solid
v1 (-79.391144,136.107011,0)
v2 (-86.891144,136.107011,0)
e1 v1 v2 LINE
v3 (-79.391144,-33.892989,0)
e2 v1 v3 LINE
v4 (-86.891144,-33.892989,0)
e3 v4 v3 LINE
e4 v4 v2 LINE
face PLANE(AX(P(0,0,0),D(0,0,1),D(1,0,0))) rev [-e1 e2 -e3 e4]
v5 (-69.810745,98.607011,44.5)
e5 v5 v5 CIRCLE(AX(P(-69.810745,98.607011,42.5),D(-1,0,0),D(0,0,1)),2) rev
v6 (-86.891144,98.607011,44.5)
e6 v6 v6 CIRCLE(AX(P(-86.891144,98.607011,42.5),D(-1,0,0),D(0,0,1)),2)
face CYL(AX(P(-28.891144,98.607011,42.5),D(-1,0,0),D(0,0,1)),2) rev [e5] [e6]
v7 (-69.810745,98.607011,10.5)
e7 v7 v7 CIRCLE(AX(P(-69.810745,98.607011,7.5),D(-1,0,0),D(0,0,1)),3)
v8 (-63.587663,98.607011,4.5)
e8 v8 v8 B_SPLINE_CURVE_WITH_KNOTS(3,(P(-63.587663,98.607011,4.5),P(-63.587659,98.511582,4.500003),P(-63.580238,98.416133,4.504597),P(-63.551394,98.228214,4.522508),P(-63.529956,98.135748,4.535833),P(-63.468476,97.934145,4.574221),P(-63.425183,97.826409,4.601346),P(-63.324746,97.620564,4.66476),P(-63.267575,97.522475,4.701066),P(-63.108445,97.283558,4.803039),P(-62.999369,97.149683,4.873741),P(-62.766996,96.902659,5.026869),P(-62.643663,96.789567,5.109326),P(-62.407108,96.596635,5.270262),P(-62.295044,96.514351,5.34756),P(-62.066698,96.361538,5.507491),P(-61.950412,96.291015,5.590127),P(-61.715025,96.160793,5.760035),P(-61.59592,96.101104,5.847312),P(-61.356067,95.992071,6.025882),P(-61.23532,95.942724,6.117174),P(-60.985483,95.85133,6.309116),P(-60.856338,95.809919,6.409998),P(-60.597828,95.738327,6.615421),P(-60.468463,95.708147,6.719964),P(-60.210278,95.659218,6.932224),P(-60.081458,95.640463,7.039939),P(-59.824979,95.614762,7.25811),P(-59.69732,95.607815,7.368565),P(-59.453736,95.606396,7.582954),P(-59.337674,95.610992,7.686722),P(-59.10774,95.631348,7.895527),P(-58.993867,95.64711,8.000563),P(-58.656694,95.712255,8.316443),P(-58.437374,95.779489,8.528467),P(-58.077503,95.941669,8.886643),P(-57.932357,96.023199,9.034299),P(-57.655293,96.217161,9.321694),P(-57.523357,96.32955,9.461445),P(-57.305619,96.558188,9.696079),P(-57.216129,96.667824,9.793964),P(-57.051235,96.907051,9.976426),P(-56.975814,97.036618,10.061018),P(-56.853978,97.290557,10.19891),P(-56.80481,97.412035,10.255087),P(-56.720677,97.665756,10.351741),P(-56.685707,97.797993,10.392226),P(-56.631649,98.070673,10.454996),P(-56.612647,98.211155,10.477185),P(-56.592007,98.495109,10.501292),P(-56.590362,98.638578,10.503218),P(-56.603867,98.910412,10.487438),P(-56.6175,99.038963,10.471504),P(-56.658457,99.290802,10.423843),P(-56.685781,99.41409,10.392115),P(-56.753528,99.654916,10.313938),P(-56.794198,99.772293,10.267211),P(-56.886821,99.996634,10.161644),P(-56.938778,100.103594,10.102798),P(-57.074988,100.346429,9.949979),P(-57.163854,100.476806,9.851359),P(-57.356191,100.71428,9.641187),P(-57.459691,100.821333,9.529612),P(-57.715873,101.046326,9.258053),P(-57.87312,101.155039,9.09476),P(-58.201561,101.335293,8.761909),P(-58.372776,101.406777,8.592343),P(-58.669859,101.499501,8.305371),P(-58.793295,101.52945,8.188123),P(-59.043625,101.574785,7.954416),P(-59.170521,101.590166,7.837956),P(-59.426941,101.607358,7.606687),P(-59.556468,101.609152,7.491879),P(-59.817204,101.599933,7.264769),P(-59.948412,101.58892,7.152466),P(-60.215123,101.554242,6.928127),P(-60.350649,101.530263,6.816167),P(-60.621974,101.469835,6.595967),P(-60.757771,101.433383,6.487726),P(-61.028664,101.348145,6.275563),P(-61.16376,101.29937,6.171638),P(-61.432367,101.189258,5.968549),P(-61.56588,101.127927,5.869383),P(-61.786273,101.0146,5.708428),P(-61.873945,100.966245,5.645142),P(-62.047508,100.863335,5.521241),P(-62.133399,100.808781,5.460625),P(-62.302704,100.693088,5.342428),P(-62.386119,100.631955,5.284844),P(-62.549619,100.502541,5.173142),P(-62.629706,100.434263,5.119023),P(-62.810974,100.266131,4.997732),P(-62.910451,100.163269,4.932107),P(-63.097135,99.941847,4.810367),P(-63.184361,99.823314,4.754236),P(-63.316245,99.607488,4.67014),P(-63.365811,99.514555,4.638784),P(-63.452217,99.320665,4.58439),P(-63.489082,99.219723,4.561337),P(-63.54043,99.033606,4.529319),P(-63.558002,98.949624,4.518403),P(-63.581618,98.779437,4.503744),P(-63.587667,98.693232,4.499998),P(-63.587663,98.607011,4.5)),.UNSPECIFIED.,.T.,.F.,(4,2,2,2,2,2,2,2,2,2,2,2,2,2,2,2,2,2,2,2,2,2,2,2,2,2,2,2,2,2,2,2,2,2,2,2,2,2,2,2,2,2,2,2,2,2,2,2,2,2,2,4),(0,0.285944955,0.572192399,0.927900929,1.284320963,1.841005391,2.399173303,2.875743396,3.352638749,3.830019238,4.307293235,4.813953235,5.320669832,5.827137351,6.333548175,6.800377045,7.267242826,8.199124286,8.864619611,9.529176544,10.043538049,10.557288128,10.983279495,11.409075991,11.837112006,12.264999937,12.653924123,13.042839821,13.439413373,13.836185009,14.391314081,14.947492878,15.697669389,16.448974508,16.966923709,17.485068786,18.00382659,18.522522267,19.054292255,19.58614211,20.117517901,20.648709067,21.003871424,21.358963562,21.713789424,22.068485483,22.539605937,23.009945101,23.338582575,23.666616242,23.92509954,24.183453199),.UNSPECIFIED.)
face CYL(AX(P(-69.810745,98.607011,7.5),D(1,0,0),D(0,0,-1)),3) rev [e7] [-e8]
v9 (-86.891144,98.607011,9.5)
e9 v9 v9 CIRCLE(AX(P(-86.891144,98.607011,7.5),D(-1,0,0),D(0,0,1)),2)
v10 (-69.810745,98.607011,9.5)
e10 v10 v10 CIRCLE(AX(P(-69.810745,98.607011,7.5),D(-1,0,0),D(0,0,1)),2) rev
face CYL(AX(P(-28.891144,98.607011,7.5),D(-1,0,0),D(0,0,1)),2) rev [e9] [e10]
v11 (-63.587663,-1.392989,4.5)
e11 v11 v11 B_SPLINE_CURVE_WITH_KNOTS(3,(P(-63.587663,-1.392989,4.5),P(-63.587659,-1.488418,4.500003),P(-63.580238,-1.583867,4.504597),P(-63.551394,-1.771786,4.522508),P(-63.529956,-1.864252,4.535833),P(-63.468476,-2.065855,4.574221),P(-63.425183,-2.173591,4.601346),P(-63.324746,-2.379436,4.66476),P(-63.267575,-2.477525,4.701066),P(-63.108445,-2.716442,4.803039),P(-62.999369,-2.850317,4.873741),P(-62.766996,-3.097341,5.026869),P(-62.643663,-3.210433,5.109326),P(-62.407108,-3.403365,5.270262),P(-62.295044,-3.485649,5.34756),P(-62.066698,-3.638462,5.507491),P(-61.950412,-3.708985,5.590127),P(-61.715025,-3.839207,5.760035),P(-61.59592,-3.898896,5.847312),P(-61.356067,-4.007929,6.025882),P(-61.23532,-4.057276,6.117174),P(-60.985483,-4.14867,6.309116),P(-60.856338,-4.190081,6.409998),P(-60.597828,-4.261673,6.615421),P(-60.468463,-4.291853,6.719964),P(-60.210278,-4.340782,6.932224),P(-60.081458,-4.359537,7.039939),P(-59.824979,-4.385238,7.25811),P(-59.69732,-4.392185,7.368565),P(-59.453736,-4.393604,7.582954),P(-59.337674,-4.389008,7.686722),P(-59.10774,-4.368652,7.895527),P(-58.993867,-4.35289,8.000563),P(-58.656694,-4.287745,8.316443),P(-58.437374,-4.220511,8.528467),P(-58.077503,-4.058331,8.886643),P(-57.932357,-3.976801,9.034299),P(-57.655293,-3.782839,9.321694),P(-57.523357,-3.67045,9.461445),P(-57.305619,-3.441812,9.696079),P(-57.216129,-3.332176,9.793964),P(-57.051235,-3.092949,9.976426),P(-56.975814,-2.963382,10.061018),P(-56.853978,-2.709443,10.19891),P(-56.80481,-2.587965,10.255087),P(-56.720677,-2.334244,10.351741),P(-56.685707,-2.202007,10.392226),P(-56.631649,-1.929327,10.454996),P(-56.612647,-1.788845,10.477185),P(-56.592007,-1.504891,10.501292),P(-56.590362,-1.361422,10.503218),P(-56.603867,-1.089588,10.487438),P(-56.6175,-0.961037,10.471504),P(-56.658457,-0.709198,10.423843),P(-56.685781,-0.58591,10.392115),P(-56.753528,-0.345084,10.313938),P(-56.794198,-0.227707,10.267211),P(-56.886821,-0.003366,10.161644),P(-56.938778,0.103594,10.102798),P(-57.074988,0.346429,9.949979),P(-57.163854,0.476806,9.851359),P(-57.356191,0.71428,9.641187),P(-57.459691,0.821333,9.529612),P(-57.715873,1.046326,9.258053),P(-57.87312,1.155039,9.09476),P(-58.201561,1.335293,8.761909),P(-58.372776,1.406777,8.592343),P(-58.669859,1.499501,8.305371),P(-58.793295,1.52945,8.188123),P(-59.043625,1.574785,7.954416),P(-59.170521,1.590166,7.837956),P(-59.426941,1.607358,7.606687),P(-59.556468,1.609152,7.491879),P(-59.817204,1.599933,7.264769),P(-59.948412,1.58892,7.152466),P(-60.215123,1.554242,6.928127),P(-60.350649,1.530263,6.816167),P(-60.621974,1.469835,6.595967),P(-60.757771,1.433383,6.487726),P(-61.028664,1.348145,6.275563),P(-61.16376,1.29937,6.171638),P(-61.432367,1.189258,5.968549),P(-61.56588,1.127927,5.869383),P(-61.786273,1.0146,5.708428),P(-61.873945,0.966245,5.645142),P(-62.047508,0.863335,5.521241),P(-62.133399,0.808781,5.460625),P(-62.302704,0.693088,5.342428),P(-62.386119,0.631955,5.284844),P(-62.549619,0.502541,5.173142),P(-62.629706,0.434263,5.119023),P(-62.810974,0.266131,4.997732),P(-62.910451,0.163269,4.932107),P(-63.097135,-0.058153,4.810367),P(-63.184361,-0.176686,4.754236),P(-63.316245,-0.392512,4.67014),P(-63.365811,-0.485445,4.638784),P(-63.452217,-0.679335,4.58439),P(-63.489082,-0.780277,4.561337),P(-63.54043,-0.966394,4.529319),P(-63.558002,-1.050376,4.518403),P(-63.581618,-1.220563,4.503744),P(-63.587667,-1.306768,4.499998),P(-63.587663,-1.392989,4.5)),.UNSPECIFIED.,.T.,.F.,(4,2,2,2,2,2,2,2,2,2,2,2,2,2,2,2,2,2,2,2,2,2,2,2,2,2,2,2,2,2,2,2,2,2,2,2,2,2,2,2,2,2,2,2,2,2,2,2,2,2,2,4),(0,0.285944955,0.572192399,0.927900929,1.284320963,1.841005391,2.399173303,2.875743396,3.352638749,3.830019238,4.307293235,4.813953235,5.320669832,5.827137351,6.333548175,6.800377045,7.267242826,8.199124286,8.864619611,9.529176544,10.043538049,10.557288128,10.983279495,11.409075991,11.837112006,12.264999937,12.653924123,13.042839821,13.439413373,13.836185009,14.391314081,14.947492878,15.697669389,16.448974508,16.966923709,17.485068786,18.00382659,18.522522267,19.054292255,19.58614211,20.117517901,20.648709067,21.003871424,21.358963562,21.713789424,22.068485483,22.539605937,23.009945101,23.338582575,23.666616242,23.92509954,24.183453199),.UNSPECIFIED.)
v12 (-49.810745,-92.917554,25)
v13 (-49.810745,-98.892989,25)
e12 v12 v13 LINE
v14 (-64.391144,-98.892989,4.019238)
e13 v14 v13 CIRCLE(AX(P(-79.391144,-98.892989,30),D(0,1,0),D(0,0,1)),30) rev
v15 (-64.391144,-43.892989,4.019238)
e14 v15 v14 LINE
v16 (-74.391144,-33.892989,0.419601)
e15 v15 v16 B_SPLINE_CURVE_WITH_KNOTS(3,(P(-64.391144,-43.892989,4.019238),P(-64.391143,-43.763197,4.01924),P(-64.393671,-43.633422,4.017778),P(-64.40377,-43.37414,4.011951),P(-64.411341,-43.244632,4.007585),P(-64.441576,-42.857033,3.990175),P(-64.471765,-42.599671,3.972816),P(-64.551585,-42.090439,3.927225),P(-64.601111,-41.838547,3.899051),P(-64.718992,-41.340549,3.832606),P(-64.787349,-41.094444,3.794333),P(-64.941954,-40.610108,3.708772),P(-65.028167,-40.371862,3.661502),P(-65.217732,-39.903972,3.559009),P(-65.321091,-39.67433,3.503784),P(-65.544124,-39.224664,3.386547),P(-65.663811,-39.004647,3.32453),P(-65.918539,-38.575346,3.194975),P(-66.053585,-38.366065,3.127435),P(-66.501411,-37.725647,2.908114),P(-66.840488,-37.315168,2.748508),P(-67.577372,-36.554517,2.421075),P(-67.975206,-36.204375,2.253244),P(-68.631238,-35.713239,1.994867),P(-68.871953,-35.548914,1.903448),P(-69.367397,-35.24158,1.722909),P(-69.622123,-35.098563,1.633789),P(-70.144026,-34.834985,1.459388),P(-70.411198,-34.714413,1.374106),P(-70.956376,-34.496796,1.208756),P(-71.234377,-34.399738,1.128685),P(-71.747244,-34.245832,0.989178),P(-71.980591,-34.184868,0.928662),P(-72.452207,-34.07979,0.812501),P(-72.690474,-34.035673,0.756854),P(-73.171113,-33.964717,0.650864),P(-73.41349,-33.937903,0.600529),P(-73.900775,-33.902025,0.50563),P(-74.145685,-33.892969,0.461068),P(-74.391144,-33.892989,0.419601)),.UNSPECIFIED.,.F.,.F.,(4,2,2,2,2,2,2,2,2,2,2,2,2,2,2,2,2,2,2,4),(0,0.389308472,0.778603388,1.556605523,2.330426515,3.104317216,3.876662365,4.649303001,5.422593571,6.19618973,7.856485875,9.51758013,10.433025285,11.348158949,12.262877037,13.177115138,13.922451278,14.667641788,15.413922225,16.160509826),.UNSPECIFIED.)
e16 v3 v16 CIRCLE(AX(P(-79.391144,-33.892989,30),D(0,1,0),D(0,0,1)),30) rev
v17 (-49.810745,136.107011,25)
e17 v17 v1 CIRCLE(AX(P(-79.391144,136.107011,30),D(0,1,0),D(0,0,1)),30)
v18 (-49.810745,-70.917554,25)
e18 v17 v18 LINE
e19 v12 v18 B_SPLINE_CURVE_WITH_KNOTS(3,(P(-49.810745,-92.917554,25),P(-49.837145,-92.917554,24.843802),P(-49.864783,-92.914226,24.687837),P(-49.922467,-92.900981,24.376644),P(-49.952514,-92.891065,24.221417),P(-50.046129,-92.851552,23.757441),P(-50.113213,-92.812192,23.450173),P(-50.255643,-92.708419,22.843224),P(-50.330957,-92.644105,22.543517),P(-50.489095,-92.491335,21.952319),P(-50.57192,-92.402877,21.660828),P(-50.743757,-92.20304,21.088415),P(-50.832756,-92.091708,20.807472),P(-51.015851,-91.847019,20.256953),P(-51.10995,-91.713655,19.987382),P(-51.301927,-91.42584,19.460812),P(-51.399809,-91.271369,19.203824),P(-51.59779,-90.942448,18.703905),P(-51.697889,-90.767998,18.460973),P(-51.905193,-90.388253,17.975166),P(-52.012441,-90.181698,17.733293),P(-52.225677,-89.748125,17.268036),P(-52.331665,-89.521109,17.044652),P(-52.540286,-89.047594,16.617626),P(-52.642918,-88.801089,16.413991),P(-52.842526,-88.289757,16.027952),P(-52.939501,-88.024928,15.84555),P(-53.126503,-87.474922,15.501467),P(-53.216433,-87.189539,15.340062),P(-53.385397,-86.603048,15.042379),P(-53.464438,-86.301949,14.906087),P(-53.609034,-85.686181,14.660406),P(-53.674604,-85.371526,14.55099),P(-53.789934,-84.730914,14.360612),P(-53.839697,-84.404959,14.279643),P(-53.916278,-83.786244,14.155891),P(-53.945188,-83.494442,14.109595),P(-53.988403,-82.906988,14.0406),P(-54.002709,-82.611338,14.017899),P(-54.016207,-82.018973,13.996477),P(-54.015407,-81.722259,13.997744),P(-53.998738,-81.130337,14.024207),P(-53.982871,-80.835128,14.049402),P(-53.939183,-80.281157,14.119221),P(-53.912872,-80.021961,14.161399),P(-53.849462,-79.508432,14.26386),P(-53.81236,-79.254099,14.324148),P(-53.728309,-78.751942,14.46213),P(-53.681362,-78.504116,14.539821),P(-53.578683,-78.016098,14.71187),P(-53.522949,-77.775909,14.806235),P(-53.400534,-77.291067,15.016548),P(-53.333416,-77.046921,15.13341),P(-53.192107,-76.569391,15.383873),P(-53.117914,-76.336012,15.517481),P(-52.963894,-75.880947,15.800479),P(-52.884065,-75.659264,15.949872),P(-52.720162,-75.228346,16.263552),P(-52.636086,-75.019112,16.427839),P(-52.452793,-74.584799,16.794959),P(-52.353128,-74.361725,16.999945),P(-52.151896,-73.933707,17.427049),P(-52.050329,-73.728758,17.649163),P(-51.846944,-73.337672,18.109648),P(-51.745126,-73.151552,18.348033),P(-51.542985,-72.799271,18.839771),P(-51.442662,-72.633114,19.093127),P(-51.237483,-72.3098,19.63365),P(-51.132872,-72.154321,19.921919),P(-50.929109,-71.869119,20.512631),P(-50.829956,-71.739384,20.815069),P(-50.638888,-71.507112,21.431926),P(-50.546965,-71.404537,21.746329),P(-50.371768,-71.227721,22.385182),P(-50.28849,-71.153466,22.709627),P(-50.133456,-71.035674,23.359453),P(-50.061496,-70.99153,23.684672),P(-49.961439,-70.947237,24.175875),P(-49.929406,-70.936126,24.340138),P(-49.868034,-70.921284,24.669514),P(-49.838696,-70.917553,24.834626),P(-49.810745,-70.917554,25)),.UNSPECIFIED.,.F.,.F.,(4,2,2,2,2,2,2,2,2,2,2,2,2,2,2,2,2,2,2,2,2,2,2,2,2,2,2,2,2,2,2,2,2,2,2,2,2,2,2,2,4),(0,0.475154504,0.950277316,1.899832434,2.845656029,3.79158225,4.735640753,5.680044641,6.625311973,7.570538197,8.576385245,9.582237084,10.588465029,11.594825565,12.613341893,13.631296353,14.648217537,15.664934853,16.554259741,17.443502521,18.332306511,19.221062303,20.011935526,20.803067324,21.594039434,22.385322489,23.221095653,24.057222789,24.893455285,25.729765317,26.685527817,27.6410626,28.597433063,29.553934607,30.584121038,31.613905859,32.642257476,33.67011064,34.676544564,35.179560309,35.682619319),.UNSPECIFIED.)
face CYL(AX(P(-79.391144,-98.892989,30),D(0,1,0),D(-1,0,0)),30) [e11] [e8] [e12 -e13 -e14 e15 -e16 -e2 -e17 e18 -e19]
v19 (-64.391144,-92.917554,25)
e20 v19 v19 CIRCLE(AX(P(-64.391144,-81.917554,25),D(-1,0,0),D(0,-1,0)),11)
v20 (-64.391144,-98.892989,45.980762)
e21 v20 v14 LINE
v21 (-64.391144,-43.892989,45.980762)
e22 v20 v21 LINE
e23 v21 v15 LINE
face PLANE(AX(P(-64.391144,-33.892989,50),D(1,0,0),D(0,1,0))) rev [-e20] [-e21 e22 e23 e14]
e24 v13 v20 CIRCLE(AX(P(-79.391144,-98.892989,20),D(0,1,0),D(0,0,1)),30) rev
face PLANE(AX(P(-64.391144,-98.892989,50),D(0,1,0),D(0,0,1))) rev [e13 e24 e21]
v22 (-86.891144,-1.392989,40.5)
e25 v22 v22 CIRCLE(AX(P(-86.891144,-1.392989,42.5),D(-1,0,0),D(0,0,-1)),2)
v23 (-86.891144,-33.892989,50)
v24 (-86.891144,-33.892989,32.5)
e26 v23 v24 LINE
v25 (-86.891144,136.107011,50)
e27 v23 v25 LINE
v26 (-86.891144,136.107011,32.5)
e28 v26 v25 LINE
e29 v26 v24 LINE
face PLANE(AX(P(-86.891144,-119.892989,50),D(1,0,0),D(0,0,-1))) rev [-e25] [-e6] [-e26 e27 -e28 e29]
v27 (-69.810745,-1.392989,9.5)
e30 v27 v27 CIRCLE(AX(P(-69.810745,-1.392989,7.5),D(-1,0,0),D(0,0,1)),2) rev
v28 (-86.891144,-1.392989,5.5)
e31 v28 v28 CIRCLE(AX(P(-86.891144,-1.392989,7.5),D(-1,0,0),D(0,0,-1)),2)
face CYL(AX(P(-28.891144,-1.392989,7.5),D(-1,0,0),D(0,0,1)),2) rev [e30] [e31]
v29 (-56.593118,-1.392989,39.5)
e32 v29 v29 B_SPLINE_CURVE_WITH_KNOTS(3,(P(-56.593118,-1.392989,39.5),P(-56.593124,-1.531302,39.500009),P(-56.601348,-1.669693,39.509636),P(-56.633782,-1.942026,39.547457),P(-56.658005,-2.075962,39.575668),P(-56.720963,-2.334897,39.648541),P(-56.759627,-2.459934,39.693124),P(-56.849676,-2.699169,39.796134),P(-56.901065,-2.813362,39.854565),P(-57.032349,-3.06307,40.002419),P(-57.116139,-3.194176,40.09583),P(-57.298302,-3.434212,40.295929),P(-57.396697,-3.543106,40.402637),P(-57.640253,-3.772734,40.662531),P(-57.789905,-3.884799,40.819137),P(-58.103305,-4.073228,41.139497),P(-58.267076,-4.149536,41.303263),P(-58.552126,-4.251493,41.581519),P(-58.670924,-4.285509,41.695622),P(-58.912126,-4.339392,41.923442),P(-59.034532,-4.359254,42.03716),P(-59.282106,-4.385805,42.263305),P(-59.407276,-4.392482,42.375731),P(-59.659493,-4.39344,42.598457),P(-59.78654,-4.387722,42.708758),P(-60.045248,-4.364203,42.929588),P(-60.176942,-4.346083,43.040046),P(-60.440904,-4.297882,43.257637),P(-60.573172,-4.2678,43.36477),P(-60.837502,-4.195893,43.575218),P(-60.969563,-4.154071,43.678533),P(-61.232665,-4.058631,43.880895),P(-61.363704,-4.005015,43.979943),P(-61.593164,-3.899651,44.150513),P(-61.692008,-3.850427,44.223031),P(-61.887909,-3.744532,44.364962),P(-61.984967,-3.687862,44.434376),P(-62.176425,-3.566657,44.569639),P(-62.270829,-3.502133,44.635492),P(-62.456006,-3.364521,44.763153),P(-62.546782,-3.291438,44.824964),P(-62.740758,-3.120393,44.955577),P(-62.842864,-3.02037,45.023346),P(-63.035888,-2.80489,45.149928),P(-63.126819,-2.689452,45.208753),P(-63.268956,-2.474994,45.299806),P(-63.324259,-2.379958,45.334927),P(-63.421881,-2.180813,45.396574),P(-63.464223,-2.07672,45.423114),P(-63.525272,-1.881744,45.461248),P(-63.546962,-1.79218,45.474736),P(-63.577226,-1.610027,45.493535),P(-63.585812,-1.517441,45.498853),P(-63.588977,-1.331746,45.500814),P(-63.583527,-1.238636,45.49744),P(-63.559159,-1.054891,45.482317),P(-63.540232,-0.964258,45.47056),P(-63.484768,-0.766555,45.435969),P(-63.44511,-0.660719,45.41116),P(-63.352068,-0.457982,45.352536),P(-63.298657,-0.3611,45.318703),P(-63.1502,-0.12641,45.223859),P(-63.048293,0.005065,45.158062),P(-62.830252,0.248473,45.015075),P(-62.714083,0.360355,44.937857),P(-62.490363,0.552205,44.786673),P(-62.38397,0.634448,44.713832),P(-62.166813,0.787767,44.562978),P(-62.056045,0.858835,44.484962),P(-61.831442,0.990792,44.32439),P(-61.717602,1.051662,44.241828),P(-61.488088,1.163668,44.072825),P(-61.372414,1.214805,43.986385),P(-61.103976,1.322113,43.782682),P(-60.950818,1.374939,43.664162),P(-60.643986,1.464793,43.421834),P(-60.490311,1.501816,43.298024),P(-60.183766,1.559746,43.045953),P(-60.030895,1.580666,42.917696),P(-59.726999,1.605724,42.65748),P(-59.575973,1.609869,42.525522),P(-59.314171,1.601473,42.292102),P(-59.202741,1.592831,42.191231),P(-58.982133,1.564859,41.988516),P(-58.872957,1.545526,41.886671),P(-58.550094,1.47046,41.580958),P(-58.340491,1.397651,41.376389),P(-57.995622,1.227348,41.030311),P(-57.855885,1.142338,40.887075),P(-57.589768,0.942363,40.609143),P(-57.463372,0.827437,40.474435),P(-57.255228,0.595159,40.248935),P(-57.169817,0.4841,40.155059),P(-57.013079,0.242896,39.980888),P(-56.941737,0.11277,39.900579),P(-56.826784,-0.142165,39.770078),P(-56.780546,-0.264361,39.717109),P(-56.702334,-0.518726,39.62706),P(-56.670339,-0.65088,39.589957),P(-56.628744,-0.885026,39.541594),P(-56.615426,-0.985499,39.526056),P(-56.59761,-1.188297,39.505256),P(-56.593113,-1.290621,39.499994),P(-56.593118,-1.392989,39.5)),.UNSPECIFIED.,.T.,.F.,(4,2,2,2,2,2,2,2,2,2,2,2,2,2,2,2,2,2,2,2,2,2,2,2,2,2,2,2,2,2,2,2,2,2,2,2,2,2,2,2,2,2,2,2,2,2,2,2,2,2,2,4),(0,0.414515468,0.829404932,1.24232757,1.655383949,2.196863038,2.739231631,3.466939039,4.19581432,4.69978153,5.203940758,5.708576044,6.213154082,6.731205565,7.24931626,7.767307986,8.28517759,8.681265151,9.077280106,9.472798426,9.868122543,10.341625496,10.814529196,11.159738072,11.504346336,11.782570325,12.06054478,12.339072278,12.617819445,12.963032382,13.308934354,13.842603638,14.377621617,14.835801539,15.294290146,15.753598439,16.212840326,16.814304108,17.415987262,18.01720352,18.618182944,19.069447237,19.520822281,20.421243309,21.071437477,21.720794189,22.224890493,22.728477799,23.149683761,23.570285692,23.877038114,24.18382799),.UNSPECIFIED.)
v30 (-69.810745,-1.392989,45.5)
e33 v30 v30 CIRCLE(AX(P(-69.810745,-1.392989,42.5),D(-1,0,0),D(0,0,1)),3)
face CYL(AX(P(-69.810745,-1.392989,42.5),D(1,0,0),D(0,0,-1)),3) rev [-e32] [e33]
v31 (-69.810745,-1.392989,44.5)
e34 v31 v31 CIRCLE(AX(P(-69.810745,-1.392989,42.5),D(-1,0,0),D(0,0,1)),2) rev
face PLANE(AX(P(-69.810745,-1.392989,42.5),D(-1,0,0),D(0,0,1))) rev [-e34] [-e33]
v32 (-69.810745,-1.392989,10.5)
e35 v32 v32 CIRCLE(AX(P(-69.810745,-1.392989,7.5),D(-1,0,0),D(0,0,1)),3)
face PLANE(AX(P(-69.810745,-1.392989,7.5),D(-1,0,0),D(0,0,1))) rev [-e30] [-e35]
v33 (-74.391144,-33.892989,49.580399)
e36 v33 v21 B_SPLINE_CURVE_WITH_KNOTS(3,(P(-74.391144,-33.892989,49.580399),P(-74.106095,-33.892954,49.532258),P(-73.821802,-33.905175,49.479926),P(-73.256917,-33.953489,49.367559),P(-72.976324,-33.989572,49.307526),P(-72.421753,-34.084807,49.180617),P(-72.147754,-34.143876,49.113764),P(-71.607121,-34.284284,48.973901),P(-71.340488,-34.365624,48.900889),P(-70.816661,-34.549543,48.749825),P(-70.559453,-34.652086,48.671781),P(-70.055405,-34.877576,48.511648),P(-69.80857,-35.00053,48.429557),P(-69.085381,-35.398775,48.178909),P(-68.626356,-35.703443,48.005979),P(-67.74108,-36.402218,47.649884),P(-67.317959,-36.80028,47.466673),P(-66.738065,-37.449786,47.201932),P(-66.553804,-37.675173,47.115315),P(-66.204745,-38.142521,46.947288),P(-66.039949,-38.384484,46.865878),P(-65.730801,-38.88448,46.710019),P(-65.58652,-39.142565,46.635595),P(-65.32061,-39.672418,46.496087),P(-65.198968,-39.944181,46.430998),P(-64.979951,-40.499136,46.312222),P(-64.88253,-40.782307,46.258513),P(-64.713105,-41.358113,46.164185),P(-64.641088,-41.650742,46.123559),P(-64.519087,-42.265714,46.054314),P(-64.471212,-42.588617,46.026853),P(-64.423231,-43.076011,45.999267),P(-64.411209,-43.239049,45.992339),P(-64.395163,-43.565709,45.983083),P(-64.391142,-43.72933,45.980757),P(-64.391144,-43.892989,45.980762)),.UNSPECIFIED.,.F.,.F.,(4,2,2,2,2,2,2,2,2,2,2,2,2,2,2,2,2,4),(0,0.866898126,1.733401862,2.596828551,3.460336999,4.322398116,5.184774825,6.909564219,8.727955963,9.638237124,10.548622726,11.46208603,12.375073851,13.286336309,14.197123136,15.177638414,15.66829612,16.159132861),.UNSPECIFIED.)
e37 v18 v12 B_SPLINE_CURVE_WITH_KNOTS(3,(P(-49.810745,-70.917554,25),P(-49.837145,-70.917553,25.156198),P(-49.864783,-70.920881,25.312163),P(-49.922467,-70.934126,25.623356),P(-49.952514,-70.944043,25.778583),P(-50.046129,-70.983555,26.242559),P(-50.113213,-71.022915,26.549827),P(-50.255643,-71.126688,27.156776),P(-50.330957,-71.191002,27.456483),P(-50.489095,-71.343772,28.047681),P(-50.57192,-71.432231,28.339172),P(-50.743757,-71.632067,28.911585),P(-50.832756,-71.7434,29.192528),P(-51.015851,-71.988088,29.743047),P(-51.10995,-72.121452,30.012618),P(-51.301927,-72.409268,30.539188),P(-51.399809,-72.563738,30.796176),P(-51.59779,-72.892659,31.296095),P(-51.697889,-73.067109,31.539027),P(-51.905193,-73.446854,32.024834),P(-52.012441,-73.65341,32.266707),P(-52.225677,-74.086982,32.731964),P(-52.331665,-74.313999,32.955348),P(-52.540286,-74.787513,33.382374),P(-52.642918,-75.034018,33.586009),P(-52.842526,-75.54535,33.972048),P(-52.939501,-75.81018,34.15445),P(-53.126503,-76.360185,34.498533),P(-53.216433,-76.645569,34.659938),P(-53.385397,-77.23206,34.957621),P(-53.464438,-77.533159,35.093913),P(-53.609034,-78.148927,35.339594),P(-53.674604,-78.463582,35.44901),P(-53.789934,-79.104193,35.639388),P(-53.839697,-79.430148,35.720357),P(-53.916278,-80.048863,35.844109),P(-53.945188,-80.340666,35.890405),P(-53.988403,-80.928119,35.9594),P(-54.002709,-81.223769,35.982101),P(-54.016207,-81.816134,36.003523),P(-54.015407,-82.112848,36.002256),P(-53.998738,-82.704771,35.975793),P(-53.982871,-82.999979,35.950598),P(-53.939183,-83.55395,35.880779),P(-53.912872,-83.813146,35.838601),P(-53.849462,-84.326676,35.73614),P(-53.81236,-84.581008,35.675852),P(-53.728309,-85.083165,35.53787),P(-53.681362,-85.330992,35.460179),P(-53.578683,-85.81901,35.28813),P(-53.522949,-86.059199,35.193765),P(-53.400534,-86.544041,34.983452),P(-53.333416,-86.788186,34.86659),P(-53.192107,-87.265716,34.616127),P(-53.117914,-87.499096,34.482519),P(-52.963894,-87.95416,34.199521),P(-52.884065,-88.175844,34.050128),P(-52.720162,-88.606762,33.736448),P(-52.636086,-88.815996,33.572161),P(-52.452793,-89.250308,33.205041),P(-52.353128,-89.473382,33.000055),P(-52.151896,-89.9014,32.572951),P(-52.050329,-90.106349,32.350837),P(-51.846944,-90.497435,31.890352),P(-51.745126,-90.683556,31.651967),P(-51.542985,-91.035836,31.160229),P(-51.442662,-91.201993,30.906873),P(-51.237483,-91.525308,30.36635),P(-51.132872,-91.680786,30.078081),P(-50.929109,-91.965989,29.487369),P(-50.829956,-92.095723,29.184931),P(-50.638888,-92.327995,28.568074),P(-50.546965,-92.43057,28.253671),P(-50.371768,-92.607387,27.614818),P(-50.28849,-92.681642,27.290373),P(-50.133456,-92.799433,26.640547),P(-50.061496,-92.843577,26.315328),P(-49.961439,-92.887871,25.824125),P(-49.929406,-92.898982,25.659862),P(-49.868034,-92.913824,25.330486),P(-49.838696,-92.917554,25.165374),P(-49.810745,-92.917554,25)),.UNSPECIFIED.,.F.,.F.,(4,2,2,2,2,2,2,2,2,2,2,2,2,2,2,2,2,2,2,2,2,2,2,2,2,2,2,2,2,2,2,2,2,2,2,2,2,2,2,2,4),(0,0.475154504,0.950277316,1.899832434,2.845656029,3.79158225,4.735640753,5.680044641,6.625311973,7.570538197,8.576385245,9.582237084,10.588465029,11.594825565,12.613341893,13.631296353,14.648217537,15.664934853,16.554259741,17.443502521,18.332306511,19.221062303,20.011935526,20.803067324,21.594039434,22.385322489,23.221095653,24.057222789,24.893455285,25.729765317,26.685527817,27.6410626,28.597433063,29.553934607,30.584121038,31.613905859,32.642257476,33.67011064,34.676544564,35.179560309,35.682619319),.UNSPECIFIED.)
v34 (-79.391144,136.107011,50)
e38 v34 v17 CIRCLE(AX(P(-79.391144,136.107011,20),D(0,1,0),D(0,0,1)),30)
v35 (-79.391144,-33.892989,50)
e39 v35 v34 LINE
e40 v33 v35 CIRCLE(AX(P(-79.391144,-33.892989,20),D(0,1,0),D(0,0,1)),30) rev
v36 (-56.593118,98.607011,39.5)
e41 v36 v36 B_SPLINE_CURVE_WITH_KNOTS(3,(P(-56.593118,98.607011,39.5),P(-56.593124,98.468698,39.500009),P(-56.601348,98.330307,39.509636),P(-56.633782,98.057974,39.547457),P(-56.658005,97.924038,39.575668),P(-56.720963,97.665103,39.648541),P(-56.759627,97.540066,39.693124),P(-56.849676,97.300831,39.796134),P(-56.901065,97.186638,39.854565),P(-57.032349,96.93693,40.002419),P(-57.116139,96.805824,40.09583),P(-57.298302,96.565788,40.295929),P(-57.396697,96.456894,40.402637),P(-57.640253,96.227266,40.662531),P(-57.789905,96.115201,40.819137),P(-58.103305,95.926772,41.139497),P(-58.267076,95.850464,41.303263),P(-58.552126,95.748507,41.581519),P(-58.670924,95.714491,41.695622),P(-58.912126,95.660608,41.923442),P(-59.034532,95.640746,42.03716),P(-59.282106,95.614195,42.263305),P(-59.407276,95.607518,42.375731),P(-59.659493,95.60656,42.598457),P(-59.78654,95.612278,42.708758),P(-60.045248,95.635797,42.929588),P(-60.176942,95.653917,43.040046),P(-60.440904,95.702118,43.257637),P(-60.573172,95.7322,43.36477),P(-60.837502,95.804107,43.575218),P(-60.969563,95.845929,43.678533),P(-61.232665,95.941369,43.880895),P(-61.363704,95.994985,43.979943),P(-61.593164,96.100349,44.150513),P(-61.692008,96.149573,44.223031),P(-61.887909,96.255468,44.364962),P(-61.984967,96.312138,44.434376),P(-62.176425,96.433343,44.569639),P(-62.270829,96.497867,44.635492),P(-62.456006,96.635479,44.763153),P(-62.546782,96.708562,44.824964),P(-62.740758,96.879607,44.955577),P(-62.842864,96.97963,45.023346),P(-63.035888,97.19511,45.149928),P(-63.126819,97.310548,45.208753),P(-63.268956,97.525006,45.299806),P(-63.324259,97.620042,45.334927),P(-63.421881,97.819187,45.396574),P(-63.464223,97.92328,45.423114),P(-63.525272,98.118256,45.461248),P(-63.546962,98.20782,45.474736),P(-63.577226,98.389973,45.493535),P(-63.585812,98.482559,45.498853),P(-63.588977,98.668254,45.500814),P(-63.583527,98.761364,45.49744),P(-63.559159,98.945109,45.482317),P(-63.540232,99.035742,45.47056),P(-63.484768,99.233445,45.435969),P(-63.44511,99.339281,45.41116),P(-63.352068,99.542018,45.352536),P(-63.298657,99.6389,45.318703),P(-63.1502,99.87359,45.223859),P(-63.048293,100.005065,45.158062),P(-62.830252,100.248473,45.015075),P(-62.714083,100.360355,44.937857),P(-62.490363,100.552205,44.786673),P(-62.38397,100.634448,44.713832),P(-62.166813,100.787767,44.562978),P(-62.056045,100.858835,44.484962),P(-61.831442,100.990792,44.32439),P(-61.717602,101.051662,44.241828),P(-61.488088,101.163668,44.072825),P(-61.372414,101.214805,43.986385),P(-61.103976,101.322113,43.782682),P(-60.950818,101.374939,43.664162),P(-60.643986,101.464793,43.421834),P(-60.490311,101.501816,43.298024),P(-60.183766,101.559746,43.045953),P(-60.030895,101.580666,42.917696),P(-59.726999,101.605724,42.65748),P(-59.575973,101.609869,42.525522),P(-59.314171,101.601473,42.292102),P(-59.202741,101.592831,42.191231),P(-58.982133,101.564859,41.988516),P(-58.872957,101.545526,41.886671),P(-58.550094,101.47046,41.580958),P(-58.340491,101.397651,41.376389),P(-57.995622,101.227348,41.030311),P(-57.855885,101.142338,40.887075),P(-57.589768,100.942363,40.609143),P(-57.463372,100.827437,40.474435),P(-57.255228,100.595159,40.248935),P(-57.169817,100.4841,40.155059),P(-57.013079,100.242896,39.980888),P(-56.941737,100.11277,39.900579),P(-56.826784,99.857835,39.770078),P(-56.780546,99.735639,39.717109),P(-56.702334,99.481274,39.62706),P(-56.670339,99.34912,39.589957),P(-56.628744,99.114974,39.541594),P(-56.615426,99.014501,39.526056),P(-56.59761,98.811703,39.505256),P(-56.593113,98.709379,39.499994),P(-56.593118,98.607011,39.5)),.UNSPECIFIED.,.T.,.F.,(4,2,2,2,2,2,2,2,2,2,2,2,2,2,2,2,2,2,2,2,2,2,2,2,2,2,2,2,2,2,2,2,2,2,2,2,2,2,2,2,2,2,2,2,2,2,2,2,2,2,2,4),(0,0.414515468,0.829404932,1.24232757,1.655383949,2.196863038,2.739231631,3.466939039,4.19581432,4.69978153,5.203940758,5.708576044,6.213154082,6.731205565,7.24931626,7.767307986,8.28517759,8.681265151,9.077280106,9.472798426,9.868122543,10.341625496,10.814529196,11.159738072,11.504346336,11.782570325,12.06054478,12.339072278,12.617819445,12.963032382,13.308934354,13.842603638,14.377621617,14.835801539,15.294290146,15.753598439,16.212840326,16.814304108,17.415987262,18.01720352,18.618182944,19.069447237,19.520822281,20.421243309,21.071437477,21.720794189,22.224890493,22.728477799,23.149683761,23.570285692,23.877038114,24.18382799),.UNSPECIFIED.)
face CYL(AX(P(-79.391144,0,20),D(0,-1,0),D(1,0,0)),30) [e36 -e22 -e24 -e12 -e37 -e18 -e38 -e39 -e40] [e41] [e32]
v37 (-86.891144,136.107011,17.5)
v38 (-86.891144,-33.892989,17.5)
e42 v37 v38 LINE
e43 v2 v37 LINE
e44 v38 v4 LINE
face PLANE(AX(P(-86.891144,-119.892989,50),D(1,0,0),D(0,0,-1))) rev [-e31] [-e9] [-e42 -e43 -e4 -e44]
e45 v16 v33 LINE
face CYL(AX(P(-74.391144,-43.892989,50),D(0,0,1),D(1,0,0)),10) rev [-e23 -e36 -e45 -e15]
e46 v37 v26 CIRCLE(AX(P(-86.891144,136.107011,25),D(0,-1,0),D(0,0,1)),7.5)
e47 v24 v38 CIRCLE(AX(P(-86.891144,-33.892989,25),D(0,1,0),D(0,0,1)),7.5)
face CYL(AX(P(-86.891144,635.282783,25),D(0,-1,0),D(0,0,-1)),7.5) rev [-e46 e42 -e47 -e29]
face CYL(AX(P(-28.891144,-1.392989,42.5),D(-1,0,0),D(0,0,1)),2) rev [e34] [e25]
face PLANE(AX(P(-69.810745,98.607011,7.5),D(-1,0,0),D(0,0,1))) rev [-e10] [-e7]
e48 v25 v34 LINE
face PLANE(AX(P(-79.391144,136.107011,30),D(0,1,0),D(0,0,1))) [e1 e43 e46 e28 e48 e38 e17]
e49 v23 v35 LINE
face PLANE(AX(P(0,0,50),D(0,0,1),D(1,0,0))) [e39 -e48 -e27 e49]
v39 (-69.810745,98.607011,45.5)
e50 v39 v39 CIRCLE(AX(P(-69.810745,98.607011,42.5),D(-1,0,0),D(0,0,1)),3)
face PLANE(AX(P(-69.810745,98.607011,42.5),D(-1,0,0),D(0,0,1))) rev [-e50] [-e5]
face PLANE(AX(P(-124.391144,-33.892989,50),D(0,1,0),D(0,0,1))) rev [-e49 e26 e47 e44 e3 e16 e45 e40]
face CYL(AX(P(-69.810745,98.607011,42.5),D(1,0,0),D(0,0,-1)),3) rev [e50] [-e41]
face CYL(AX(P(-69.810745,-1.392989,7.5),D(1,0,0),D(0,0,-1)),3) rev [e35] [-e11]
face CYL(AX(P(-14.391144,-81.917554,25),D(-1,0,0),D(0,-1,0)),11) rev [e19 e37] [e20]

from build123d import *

# Parameters (mm, degrees)
BOSS_EXTRU_1_DEPTH            = 50
CONG_4_R                      = 35
CONG_5_R                      = 35
CONG_6_R                      = 30
CONG_12_R                     = 10
ESQUISSE3_R                   = 11
ENL_V_MAT_EXTRU_4_DEPTH       = 50
ENL_V_MAT_EXTRU_8_DEPTH       = 251
ESQUISSE6_R                   = 2
ENL_V_MAT_EXTRU_9_DEPTH       = 58
ENL_V_MAT_EXTRU_12_DEPTH      = 251.898527225
ENL_V_MAT_EXTRU_12_DEPTH_BACK = 179
ESQUISSE11_R                  = 3
ENL_V_MAT_EXTRU_14_DEPTH      = 20
BOSS_EXTRU_2_DEPTH            = 5


with BuildPart() as part:
    # Esquisse1 → Boss.-Extru.1 (new body)
    with BuildSketch(Plane.XY):
        Polygon((-129.391143911, 131.10701107), (-129.391143911, -98.89298893), (-124.391143911, -98.89298893), (-124.391143911, -33.89298893), (-64.391143911, -33.89298893), (-64.391143911, -98.89298893), (-49.391143911, -98.89298893), (-49.391143911, 131.10701107), align=None)
    extrude(amount=BOSS_EXTRU_1_DEPTH)

    # Congé4
    cong_4_edges = [part.edges().sort_by_distance(p)[0] for p in [
        (-129.391143911, 16.10701107, 50),
    ]]
    fillet(cong_4_edges, radius=CONG_4_R)

    # Congé5
    # the kernel refuses this fillet: 35 mm, written as the material it takes off along each edge
    with BuildSketch(Plane(origin=(-129.391143911, 202.914044152, 0), x_dir=(0, 0, 1), z_dir=(0, -1, 0))) as cong_5_piece_1:
        with BuildLine():
            CenterArc((35, -28.722813233), CONG_5_R, 124.849904579, 55.150095421)
            Line((0, -28.722813233), (-0.7, -28.722813233))
            Line((-0.7, -28.722813233), (-0.7, 0))
            Line((-0.7, 0), (0, 0.7))
            ThreePointArc((0, 0.7), (7.5, 0.7), (14.6, 0.574456265))
            Line((14.6, 0.574456265), (15, 0))
        make_face()
    extrude(amount=373.614066163, mode=Mode.SUBTRACT)

    # Congé6
    # the kernel refuses this fillet: 30 mm, written as the material it takes off along each edge
    with BuildSketch(Plane(origin=(-49.391143911, -173.89298893, 0), x_dir=(-1, 0, 0), z_dir=(0, 1, 0))) as cong_6_piece_1:
        with BuildLine():
            CenterArc((CONG_6_R, CONG_6_R), CONG_6_R, 180, 90)
            Line((0, CONG_6_R), (0, 0))
            Line((0, 0), (CONG_6_R, 0))
        make_face()
    extrude(amount=380, mode=Mode.SUBTRACT)
    with BuildSketch(Plane(origin=(-49.391143911, -173.89298893, 50), x_dir=(-1, 0, 0), z_dir=(0, 1, 0))) as cong_6_piece_2:
        with BuildLine():
            CenterArc((CONG_6_R, -CONG_6_R), CONG_6_R, 90, 90)
            Line((0, -CONG_6_R), (0, 0))
            Line((0, 0), (CONG_6_R, 0))
        make_face()
    extrude(amount=380, mode=Mode.SUBTRACT)

    # Congé12
    cong_12_edges = [part.edges().sort_by_distance(p)[0] for p in [
        (-124.391143911, -33.89298893, 21.146981396),
        (-64.391143911, -33.89298893, 25),
    ]]
    fillet(cong_12_edges, radius=CONG_12_R)

    # Esquisse3 → Enlèv. mat.-Extru.4 (cut)
    with BuildSketch(Plane.ZY.offset(64.391143911)):
        with Locations(Location((25, -81.917553746, 0), (0, 0, 270))):
            Circle(ESQUISSE3_R)
    extrude(amount=-ENL_V_MAT_EXTRU_4_DEPTH, mode=Mode.SUBTRACT)

    # Esquisse5 → Enlèv. mat.-Extru.8 (cut)
    with BuildSketch(Plane(origin=(0, 131.10701107, 0), x_dir=(1, 0, 0), z_dir=(0, 1, 0))):
        with BuildLine():
            Line((-86.891143911, -50), (-86.891143911, 0))
            ThreePointArc((-86.891143911, 0), (-162.141280076, -25), (-86.891143911, -50))
        make_face()
    extrude(amount=-ENL_V_MAT_EXTRU_8_DEPTH, mode=Mode.SUBTRACT)

    # Esquisse6 → Enlèv. mat.-Extru.9 (cut)
    with BuildSketch(Plane.ZY.offset(86.891143911)):
        with Locations((7.5, 98.60701107)):
            Circle(ESQUISSE6_R)
        with Locations((42.5, 98.60701107)):
            Circle(ESQUISSE6_R)
        with Locations((42.5, -1.39298893)):
            Circle(ESQUISSE6_R)
        with Locations((7.5, -1.39298893)):
            Circle(ESQUISSE6_R)
    extrude(amount=-ENL_V_MAT_EXTRU_9_DEPTH, mode=Mode.SUBTRACT)

    # Esquisse9 → Enlèv. mat.-Extru.12 (cut, two sides: drawn at the far end of the back side and taken through both)
    with BuildSketch(Plane(origin=(0, 131.10701107, 0), x_dir=(1, 0, 0), z_dir=(0, 1, 0)).offset(-ENL_V_MAT_EXTRU_12_DEPTH_BACK)):
        with BuildLine():
            Line((-195.505666121, -17.5), (-86.891143911, -17.5))
            ThreePointArc((-86.891143911, -17.5), (-79.391143911, -25), (-86.891143911, -32.5))
            Line((-86.891143911, -32.5), (-195.505666121, -32.5))
            Line((-195.505666121, -32.5), (-412.73471054, -32.5))
            Line((-412.73471054, -32.5), (-412.73471054, -17.5))
            Line((-412.73471054, -17.5), (-195.505666121, -17.5))
        make_face()
    extrude(amount=ENL_V_MAT_EXTRU_12_DEPTH + ENL_V_MAT_EXTRU_12_DEPTH_BACK, mode=Mode.SUBTRACT)

    # Esquisse11 → Enlèv. mat.-Extru.14 (cut)
    with BuildSketch(Plane.ZY.offset(49.810744996)):
        with Locations(Location((42.5, 98.60701107, 0), (0, 0, 180))):
            Circle(ESQUISSE11_R)
        with Locations(Location((7.5, 98.60701107, 0), (0, 0, 180))):
            Circle(ESQUISSE11_R)
        with Locations(Location((42.5, -1.39298893, 0), (0, 0, 180))):
            Circle(ESQUISSE11_R)
        with Locations(Location((7.5, -1.39298893, 0), (0, 0, 180))):
            Circle(ESQUISSE11_R)
    extrude(amount=ENL_V_MAT_EXTRU_14_DEPTH, mode=Mode.SUBTRACT)

    # Esquisse12 → Boss.-Extru.2 (add)
    with BuildSketch(Plane(origin=(0, 131.10701107, 0), x_dir=(1, 0, 0), z_dir=(0, 1, 0))):
        with BuildLine():
            Line((-79.391143911, 0), (-86.891143911, 0))
            Line((-86.891143911, 0), (-86.891143911, -17.5))
            ThreePointArc((-86.891143911, -17.5), (-79.391143911, -25), (-86.891143911, -32.5))
            Line((-86.891143911, -32.5), (-86.891143911, -50))
            Line((-86.891143911, -50), (-79.391143911, -50))
            ThreePointArc((-79.391143911, -50), (-60.02622718, -42.912878475), (-49.810744996, -25))
            ThreePointArc((-49.810744996, -25), (-60.02622718, -7.087121525), (-79.391143911, 0))
        make_face()
    extrude(amount=BOSS_EXTRU_2_DEPTH)


solid = part.part
